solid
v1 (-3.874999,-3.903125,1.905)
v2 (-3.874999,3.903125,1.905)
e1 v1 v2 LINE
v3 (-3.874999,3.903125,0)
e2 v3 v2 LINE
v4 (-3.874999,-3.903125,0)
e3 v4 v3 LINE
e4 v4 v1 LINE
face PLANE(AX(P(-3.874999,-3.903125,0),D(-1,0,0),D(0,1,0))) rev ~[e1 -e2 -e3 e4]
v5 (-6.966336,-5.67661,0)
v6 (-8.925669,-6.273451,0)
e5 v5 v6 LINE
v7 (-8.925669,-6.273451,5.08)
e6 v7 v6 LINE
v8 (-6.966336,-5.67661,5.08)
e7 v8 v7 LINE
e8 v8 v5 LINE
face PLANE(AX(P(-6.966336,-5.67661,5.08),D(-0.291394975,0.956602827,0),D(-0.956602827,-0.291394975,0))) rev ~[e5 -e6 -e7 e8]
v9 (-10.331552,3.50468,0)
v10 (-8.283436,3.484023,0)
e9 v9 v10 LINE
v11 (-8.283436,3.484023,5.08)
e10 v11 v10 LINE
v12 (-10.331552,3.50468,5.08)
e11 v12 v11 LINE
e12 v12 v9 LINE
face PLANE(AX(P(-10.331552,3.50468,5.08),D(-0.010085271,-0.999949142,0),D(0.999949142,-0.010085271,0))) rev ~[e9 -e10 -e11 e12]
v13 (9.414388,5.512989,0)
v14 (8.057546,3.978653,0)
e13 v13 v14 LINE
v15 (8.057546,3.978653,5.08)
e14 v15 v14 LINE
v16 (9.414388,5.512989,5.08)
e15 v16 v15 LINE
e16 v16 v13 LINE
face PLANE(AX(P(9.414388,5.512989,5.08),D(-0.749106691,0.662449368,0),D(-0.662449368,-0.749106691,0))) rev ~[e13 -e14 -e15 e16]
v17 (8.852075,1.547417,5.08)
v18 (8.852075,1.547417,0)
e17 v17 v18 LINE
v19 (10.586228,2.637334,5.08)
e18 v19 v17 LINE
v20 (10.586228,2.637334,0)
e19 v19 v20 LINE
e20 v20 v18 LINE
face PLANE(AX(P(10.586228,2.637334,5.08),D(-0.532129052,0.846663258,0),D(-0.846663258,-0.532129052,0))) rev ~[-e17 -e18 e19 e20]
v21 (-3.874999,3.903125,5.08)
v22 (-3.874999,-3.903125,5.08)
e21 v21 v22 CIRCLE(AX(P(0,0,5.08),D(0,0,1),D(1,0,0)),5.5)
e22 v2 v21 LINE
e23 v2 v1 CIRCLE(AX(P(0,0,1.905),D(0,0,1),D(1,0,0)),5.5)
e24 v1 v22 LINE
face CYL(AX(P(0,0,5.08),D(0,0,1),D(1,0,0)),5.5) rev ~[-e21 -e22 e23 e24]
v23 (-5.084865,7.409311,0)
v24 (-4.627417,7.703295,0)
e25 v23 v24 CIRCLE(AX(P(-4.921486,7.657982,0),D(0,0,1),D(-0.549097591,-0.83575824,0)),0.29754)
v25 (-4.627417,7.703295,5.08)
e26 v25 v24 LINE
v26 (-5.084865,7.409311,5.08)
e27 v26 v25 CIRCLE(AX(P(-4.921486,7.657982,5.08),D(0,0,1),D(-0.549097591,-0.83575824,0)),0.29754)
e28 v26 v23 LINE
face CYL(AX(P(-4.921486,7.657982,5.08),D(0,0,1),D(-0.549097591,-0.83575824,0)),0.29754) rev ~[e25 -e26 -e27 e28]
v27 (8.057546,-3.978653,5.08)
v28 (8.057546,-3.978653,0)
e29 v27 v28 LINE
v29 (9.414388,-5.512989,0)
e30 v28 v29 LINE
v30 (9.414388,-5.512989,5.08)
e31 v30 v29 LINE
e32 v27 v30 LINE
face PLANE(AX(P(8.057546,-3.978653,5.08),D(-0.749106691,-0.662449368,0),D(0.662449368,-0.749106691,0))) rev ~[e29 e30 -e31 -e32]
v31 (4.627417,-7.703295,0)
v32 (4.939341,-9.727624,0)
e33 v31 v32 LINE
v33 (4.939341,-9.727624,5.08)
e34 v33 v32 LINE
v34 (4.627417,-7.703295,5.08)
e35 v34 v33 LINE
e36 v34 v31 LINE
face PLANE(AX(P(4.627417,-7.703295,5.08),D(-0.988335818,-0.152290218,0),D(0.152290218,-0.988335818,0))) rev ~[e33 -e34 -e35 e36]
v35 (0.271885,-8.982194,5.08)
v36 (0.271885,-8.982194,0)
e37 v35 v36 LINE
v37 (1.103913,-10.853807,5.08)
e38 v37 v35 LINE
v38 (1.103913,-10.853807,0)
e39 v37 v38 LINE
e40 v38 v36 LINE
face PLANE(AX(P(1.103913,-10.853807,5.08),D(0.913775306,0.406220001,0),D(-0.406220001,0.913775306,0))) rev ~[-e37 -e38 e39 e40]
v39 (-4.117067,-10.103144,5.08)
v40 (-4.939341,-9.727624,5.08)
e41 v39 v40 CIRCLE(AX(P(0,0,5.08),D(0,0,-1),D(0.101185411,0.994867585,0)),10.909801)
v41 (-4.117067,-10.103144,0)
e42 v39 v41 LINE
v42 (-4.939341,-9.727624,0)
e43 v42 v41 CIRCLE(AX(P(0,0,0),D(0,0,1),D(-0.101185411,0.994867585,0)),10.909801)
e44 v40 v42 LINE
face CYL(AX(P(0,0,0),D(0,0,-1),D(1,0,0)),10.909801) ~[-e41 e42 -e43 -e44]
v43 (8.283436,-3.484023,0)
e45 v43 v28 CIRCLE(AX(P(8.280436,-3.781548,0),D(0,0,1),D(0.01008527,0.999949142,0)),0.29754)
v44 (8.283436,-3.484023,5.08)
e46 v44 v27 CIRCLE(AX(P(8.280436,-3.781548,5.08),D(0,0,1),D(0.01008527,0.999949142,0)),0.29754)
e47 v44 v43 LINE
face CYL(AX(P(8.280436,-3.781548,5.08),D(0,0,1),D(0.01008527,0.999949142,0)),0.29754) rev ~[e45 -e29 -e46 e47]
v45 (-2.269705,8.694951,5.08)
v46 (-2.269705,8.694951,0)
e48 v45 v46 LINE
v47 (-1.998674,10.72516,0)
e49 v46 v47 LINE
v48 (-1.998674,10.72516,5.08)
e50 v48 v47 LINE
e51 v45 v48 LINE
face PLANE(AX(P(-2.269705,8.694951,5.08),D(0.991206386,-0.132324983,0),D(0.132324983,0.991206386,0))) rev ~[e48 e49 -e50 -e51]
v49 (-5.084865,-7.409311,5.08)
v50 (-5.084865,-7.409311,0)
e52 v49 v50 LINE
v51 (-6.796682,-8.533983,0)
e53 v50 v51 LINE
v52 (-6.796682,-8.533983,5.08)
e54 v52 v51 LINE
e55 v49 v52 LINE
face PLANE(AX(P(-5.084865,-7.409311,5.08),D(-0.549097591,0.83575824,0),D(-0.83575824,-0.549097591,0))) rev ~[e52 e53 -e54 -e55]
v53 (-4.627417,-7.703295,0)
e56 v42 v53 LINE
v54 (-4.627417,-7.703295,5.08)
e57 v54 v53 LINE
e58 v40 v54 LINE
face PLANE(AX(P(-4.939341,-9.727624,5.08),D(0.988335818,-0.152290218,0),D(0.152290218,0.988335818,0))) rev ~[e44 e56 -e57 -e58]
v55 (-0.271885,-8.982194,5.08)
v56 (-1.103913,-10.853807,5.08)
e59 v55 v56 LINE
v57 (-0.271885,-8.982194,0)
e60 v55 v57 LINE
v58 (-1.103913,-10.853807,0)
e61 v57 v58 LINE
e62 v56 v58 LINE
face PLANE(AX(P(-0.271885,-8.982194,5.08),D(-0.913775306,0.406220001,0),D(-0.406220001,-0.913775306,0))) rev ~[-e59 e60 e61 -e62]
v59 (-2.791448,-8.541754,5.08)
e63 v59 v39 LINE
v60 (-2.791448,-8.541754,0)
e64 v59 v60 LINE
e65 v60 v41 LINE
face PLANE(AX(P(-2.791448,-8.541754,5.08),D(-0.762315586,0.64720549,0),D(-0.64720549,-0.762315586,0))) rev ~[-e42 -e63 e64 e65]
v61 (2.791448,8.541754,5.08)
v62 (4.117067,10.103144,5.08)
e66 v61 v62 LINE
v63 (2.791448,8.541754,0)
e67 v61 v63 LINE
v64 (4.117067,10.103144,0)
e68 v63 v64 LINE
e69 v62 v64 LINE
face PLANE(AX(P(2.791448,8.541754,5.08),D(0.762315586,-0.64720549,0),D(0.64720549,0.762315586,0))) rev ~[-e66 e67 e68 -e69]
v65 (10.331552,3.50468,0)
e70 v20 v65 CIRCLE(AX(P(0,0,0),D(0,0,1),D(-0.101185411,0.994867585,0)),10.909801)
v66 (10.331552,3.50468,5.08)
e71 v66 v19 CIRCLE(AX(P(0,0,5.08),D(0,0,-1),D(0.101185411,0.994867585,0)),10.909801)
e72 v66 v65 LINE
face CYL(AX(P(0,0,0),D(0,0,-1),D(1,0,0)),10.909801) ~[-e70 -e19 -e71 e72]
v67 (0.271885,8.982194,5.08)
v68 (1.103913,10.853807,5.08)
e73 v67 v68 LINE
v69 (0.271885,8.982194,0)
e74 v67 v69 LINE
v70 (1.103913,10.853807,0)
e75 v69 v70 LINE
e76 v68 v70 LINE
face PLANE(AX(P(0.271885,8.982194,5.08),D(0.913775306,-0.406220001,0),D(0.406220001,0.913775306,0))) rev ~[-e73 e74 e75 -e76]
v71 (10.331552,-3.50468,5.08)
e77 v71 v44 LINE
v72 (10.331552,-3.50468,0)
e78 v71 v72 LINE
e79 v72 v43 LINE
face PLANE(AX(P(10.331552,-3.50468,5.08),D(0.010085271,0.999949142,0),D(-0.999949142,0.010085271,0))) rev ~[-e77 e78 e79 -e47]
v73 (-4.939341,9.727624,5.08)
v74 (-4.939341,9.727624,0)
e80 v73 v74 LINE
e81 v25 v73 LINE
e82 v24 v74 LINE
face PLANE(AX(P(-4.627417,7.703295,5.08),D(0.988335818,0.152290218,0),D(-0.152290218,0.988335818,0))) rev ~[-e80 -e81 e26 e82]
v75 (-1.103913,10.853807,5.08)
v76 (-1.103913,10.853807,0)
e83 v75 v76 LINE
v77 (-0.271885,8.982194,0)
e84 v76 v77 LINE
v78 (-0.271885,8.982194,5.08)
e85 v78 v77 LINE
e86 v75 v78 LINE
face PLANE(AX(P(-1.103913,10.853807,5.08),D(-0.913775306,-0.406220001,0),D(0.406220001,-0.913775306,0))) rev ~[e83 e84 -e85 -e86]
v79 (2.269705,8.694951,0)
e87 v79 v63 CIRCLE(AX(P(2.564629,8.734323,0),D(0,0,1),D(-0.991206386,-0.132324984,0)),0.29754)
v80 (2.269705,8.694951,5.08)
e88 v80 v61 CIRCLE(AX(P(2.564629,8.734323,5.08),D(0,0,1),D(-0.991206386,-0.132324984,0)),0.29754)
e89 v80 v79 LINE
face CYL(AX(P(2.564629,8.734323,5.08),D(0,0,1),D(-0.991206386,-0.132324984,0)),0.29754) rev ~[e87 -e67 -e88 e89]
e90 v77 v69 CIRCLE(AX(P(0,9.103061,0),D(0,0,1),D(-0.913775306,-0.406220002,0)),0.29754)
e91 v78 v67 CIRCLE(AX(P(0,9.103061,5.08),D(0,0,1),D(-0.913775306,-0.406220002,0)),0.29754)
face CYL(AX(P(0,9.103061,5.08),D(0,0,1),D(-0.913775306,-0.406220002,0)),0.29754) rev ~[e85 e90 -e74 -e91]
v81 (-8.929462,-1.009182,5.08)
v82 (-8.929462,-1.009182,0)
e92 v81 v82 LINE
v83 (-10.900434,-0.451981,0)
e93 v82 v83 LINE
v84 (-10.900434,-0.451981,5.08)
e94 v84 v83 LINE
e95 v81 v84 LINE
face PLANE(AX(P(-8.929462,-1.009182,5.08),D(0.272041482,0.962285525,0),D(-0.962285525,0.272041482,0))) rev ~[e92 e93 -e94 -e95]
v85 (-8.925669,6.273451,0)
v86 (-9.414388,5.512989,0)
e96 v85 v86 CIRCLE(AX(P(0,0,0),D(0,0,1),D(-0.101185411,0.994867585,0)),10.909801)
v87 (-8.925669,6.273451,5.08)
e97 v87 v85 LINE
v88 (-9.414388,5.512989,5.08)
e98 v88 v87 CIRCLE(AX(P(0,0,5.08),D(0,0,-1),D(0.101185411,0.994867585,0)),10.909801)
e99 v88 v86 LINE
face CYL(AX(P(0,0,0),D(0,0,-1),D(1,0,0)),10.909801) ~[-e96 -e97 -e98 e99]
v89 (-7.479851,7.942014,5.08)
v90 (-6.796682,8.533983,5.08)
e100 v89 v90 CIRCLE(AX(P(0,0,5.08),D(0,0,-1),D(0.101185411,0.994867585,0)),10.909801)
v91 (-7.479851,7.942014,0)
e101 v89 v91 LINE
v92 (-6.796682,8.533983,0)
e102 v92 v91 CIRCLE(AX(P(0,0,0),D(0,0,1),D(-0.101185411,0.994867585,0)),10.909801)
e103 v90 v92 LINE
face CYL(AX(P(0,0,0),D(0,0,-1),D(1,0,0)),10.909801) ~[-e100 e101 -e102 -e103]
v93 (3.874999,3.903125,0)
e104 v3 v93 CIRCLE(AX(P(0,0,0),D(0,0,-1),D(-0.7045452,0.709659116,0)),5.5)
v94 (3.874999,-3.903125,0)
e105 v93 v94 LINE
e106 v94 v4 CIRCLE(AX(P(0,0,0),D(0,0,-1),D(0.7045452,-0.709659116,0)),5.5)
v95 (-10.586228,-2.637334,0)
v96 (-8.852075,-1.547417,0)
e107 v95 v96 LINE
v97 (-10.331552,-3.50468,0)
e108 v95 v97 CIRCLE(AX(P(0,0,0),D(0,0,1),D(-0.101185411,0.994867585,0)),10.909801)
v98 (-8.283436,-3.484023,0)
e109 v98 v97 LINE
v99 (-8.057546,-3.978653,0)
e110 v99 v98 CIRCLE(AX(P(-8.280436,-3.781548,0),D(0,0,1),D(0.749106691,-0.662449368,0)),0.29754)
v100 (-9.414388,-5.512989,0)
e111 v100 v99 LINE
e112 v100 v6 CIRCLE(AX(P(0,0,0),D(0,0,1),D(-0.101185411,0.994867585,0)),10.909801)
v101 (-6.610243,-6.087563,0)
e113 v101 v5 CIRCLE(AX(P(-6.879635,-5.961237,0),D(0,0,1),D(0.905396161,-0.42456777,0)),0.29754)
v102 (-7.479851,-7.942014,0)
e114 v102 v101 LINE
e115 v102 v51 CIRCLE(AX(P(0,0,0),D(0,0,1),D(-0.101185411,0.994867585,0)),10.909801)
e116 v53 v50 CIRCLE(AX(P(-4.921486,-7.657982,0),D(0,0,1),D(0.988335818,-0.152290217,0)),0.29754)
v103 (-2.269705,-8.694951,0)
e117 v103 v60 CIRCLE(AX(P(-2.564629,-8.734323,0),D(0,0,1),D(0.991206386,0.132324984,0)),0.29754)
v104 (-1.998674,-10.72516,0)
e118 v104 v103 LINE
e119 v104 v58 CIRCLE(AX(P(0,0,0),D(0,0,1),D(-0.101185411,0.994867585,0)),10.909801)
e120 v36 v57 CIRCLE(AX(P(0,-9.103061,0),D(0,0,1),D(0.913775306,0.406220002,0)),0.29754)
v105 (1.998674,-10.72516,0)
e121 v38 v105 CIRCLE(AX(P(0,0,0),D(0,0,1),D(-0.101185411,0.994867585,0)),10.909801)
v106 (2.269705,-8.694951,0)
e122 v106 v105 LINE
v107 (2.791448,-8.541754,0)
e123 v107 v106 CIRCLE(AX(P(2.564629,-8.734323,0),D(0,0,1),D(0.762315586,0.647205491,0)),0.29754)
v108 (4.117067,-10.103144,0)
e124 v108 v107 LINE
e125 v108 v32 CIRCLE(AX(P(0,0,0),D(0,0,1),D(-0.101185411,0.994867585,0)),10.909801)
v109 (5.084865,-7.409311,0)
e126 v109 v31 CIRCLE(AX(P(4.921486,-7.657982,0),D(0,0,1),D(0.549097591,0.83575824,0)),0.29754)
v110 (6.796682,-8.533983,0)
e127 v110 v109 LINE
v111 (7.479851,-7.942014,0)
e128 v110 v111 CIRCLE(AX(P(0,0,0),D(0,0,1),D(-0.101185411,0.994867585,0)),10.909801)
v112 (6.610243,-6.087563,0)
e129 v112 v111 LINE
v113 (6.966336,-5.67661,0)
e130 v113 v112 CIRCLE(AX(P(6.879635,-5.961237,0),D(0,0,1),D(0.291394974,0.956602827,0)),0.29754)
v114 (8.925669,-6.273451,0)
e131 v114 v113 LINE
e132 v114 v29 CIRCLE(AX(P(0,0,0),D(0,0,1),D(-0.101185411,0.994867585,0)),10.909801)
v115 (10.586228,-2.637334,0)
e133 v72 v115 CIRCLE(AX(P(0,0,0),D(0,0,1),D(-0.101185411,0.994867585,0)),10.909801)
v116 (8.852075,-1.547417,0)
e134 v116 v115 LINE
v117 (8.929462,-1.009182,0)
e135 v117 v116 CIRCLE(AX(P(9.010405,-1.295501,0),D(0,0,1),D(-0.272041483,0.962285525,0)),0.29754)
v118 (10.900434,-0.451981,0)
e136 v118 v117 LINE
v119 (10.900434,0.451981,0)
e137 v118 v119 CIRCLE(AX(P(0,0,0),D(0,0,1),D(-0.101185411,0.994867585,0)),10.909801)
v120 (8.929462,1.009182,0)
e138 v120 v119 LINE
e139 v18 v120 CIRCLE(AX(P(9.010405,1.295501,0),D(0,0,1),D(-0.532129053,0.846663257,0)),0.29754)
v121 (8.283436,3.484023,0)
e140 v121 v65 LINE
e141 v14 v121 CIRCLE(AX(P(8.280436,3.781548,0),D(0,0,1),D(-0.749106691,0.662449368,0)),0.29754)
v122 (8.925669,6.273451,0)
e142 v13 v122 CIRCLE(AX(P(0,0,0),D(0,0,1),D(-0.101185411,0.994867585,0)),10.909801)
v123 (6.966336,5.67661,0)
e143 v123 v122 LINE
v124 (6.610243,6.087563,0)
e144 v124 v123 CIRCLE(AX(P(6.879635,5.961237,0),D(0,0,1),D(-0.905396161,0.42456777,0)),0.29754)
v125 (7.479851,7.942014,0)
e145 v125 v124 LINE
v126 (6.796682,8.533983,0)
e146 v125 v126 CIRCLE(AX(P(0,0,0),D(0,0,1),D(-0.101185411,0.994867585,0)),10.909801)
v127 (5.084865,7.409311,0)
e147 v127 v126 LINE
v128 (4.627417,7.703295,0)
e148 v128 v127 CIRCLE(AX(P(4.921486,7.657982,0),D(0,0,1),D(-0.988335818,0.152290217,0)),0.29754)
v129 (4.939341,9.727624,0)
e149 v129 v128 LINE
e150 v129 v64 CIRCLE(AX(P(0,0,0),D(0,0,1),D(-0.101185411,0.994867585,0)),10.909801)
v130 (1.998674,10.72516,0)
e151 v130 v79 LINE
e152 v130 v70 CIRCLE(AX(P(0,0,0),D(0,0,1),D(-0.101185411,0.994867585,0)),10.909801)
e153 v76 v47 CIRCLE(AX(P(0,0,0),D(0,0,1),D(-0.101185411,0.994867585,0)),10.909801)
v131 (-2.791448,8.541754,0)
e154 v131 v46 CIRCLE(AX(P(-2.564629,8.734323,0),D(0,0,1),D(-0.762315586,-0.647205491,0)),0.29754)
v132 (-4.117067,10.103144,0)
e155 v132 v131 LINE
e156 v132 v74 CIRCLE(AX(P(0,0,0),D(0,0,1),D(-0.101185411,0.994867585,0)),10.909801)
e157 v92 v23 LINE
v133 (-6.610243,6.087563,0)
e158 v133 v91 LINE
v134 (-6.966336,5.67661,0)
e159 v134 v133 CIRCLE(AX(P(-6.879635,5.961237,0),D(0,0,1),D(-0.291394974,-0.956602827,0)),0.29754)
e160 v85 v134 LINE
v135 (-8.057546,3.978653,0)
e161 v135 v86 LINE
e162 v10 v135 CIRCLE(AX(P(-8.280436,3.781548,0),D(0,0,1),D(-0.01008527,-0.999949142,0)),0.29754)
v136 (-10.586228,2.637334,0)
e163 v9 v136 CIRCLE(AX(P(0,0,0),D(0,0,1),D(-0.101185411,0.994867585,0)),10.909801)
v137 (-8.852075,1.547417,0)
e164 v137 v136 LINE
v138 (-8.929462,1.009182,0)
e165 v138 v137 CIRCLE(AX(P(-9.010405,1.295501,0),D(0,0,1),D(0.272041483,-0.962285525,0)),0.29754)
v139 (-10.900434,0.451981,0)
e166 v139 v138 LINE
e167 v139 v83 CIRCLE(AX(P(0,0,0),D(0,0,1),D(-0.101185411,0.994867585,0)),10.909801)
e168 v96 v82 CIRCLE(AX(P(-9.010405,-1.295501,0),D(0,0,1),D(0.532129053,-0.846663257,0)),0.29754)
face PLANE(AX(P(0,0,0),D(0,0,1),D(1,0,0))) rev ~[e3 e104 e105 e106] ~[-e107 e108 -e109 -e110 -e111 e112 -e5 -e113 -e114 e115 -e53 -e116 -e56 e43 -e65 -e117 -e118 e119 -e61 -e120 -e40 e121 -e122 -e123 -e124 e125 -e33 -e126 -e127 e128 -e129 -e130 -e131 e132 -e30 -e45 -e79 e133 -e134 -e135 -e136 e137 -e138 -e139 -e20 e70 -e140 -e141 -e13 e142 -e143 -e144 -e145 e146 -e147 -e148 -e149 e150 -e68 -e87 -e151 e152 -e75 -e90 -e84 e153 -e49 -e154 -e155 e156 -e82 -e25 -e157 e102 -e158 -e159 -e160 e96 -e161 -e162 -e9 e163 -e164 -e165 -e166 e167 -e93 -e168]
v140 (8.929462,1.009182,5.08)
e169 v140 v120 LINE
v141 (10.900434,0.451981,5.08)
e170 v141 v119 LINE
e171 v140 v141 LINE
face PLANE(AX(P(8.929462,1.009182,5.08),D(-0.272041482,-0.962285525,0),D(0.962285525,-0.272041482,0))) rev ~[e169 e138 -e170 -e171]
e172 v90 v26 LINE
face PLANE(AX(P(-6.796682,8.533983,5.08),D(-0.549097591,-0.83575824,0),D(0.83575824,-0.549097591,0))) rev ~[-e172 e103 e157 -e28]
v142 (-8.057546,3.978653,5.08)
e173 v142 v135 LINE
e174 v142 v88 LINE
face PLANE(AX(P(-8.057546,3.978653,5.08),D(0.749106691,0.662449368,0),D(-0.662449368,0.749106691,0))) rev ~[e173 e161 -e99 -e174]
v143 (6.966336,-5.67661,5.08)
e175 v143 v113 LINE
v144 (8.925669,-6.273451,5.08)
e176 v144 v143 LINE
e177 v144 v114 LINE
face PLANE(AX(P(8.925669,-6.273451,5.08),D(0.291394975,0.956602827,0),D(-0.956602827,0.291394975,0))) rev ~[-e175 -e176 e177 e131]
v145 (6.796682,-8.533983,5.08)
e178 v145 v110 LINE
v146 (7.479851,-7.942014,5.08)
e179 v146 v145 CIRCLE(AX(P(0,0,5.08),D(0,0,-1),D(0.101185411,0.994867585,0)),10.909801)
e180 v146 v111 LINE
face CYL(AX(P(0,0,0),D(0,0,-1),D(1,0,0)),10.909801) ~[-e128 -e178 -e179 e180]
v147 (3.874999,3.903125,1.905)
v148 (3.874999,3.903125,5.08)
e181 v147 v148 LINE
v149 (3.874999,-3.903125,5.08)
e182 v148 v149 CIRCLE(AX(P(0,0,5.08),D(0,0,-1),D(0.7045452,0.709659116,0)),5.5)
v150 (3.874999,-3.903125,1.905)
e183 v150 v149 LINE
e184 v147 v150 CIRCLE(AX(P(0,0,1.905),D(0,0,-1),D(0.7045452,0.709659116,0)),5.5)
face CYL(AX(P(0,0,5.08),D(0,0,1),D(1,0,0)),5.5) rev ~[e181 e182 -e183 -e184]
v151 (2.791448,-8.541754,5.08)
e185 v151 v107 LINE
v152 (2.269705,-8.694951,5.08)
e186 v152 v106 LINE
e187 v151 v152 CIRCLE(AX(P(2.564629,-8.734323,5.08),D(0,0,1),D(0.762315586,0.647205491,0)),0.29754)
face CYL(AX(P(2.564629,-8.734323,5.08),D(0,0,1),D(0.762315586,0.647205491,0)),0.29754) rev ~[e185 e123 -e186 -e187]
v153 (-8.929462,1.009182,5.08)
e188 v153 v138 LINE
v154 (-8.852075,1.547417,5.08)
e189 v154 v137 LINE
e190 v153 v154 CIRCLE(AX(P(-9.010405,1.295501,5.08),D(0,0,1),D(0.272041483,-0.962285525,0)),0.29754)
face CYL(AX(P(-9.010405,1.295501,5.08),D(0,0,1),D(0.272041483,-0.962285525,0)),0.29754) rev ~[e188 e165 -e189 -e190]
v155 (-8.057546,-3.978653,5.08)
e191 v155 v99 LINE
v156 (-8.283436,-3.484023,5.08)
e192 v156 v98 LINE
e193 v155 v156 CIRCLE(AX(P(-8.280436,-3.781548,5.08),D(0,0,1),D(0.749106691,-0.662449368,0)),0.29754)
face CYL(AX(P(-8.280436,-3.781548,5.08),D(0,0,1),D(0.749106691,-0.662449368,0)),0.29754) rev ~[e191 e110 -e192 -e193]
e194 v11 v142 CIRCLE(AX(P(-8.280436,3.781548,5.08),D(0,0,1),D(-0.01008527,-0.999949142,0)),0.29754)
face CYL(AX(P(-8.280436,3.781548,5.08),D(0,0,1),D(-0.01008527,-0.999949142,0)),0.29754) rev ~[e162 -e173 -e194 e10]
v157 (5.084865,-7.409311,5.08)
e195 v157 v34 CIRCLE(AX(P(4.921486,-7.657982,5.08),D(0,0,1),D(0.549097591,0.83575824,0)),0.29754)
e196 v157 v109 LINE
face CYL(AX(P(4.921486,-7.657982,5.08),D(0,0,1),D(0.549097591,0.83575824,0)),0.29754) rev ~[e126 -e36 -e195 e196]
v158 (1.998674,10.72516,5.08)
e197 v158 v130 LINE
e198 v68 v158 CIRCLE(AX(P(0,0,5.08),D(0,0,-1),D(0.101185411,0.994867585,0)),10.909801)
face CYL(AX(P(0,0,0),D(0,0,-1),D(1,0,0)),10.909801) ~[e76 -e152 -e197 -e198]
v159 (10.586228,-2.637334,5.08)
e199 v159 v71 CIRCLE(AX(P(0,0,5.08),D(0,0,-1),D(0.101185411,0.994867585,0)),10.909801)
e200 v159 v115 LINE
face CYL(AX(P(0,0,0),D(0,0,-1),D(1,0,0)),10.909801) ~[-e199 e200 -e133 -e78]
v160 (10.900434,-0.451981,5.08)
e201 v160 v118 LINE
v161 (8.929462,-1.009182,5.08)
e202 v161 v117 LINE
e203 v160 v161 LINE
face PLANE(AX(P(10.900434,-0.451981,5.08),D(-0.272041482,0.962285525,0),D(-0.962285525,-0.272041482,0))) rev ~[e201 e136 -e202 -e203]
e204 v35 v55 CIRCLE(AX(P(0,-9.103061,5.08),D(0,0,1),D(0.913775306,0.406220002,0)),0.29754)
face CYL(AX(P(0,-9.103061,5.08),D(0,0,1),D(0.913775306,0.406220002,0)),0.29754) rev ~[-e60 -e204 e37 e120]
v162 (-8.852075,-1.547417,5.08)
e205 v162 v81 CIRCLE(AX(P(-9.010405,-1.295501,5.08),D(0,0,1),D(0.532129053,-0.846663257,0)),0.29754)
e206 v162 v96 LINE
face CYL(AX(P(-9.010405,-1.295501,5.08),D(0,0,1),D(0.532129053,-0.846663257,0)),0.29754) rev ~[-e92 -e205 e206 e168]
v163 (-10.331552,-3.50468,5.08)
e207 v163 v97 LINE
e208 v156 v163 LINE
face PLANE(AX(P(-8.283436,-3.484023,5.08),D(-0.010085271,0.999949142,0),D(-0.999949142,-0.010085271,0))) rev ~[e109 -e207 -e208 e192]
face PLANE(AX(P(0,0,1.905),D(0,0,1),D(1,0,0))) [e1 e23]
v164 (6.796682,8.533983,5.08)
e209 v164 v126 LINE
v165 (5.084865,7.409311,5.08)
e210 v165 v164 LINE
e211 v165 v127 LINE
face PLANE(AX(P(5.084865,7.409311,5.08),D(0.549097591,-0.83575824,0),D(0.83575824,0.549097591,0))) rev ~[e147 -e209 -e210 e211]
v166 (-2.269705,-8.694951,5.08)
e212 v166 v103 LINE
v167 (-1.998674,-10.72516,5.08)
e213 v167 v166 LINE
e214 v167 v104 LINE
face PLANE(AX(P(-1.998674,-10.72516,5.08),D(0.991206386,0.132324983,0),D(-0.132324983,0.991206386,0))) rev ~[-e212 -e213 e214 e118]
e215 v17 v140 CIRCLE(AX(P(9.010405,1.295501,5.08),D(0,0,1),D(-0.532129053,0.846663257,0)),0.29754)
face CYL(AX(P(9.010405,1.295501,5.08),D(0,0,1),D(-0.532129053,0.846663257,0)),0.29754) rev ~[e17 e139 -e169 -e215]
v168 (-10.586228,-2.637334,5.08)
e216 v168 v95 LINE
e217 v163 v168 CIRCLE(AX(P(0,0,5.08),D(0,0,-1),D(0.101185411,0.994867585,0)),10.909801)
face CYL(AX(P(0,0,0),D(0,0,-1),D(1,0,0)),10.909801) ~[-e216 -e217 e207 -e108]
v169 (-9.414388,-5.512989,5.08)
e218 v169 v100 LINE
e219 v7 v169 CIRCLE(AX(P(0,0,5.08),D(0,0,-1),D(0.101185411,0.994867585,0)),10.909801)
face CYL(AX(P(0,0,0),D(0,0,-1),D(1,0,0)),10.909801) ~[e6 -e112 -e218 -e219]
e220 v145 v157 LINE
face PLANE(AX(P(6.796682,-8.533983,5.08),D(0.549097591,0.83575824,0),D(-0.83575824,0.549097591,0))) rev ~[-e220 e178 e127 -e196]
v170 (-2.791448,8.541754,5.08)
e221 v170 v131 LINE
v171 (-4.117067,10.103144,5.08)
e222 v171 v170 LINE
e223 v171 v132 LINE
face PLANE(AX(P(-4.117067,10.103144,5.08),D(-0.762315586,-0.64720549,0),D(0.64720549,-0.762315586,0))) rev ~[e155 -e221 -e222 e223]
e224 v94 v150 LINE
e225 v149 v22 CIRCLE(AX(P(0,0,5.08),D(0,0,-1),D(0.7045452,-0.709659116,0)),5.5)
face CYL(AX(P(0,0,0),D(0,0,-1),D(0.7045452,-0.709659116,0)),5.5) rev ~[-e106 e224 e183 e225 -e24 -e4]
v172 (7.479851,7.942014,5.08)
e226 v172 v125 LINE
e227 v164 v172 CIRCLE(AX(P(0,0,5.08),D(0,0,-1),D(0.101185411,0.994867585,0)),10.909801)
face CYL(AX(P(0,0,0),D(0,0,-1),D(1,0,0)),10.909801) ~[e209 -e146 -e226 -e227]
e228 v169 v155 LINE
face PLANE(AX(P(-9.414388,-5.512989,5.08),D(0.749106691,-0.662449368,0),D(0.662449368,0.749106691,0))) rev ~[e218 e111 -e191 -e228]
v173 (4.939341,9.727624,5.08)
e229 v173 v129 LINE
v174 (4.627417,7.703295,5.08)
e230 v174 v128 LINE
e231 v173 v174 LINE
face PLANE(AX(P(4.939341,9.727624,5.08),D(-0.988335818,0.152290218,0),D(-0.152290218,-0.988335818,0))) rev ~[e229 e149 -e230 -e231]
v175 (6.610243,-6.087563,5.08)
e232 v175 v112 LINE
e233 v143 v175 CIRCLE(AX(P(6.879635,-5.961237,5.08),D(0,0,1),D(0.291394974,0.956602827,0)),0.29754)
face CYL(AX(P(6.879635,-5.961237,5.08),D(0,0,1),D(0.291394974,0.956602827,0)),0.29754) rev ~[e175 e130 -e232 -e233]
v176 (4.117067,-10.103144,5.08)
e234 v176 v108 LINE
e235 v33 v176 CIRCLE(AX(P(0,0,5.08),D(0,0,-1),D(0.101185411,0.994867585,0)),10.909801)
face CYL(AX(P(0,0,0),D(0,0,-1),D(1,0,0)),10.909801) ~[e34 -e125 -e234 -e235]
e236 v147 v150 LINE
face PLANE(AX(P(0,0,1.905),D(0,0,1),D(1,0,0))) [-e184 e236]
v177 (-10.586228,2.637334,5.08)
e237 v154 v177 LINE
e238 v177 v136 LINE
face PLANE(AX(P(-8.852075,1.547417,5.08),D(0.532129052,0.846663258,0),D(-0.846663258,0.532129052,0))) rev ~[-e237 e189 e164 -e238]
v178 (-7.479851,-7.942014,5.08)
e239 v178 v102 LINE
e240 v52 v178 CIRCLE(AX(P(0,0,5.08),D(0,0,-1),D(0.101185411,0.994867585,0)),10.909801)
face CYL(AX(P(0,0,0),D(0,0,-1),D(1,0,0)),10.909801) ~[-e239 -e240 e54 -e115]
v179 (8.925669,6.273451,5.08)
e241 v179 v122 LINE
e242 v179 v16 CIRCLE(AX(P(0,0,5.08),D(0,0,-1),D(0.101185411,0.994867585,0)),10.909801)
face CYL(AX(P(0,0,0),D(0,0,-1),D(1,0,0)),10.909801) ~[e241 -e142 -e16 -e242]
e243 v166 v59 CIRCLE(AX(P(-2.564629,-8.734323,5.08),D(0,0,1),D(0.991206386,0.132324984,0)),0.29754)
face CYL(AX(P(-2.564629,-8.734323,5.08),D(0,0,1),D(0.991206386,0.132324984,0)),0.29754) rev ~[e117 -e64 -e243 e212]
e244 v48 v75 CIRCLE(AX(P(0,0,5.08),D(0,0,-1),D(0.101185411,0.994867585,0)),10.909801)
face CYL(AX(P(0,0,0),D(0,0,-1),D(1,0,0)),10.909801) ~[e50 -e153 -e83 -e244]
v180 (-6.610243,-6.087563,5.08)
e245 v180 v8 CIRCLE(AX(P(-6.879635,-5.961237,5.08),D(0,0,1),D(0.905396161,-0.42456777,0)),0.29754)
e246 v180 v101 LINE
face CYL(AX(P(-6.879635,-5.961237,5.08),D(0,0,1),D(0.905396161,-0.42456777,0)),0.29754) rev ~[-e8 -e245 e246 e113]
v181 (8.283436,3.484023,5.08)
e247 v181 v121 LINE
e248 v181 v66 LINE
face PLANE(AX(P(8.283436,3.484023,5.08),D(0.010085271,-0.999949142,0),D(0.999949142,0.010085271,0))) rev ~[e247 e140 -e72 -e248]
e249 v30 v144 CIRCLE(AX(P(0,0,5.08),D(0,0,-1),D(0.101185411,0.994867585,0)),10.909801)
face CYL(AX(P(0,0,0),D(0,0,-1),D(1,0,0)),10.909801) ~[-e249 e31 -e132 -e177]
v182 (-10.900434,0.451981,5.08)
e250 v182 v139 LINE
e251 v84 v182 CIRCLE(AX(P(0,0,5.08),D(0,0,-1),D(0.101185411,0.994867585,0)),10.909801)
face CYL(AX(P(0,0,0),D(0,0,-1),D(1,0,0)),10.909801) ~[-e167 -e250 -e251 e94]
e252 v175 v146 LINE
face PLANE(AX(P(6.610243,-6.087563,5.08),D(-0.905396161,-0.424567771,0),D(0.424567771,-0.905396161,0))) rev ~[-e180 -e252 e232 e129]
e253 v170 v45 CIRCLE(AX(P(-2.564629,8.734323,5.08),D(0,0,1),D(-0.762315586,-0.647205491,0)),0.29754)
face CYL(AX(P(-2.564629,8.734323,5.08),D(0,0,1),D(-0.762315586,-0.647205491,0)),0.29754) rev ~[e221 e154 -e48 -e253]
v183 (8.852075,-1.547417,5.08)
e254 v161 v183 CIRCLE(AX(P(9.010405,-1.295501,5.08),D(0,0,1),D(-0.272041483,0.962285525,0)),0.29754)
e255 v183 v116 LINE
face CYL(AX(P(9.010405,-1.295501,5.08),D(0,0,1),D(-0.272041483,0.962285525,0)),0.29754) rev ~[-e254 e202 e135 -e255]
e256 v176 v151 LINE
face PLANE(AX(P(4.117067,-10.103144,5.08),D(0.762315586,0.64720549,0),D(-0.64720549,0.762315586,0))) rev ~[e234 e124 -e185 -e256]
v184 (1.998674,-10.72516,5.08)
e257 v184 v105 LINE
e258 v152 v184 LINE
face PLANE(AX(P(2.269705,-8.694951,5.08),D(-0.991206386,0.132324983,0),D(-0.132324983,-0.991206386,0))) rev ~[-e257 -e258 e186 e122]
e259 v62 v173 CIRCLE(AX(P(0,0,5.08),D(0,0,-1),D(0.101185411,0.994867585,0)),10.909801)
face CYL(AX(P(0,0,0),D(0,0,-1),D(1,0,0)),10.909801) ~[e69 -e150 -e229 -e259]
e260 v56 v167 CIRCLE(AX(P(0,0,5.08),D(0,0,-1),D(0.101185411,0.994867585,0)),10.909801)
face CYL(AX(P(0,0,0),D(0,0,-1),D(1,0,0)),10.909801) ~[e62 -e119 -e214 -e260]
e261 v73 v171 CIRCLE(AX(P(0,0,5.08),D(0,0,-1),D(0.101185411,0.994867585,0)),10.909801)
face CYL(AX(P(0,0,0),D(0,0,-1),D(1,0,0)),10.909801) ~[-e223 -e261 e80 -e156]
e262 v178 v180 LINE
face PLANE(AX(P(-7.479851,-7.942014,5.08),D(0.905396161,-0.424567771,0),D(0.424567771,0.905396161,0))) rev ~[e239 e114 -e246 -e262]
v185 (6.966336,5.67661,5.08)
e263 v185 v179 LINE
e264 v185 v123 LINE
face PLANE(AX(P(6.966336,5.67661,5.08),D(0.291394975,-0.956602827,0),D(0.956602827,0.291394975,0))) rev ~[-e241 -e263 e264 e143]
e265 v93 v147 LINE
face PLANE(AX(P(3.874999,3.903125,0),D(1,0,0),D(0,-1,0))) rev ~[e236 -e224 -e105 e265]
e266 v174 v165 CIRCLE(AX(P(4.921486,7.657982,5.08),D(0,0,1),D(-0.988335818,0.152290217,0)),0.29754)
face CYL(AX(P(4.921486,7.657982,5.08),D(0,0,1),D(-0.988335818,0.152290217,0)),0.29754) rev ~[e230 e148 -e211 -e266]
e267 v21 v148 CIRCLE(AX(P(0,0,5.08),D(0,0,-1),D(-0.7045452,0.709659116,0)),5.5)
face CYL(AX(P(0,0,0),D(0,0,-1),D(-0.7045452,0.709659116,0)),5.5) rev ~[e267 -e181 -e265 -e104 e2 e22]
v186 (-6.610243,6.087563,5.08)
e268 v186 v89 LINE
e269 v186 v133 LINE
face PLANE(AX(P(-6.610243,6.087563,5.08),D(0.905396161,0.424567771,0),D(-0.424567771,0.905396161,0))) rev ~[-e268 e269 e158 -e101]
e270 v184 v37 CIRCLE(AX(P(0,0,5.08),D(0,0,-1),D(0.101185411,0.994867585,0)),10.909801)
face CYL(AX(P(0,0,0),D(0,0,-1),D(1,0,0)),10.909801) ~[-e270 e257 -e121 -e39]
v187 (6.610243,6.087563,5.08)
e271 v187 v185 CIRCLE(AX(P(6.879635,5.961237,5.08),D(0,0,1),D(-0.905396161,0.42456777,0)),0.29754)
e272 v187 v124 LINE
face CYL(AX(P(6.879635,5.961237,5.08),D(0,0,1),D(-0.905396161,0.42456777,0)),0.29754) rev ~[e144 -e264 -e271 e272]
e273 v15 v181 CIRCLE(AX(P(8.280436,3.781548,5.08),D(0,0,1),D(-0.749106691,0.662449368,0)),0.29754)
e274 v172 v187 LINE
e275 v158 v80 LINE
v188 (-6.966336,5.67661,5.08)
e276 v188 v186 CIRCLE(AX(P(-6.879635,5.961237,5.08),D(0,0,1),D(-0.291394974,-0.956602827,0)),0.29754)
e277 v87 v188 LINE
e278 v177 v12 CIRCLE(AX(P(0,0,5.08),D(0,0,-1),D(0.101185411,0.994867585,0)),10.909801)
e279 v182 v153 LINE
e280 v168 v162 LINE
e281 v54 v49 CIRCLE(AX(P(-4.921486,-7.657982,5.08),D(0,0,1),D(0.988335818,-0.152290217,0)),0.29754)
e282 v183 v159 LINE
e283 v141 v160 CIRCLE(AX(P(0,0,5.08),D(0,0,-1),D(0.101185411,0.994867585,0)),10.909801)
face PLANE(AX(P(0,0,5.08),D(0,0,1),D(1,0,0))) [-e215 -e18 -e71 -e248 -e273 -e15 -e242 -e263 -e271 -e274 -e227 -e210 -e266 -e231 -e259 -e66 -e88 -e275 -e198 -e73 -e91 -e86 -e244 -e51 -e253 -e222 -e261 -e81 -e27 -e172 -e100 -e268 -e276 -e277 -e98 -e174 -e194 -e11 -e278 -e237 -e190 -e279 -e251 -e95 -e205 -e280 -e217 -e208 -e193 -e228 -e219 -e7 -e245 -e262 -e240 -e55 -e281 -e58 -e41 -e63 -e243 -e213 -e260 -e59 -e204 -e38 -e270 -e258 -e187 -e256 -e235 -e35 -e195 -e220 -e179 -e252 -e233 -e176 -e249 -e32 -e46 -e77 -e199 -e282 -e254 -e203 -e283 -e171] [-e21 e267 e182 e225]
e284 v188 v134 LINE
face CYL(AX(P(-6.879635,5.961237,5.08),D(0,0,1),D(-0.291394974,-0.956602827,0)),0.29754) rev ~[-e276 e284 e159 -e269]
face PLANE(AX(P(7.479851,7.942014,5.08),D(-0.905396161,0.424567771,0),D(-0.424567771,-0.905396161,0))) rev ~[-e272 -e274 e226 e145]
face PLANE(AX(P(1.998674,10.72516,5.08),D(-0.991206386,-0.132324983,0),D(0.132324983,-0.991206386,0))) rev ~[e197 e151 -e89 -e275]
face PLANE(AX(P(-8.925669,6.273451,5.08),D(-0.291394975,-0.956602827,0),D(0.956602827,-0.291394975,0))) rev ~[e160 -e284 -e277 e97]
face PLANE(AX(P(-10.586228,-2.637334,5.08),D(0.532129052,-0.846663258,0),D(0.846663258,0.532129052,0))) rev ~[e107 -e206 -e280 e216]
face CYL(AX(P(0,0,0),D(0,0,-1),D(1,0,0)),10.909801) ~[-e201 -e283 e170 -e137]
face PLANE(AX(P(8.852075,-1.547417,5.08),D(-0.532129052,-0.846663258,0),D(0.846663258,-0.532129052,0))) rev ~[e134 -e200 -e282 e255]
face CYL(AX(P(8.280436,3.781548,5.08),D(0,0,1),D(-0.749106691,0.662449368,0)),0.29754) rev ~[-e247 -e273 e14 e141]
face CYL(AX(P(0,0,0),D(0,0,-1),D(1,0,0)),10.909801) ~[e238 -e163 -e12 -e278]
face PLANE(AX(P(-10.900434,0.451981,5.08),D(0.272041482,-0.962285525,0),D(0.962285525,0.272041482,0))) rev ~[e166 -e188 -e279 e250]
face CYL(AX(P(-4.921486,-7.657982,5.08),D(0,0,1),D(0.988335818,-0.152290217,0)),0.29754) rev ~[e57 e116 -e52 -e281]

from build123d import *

# Parameters (mm, degrees)
F0_R            = 10.909800859
F1_DEPTH        = 5.08
F3_DEPTH        = 5.08
F3_COPIES_COUNT = 22
F4_R            = 5.5
F5_DEPTH        = 3.175


# Not quite as in the source:
# - a pattern or mirror of a feature is missing from the dataset's text; its kind, count and spacing are read off the source's solid


with BuildPart() as f1:
    # F0 (on Top) → F1 (new body)
    with BuildSketch(Plane.XY):
        Circle(F0_R)
        with BuildLine():
            ThreePointArc((3.8749986, -3.9031251389), (0, -5.5), (-3.8749986, -3.9031251389))
            Line((-3.8749986, -3.9031251389), (-3.8749986, 3.9031251389))
            ThreePointArc((-3.8749986, 3.9031251389), (0, 5.5), (3.8749986, 3.9031251389))
            Line((3.8749986, 3.9031251389), (3.8749986, -3.9031251389))
        make_face(mode=Mode.SUBTRACT)
    extrude(amount=F1_DEPTH)

    # F2 (on face) → F3 (cut, through all)
    with BuildSketch(Plane.XY.offset(5.08)):
        with BuildLine():
            Line((0.2718847261, 8.9821943232), (1.1039126824, 10.8538072386))
            ThreePointArc((1.1039126824, 10.8538072386), (0, 10.909800859), (-1.1039126824, 10.8538072386))
            Line((-1.1039126824, 10.8538072386), (-0.2718847261, 8.9821943232))
            ThreePointArc((-0.2718847261, 8.9821943232), (0, 8.8055210085), (0.2718847261, 8.9821943232))
        make_face()
    f3 = extrude(amount=-F3_DEPTH, mode=Mode.SUBTRACT)

    # F3_copies: F3 ×22 about axis
    f3_copies_axis = Axis((0, 0, 0), (0, 0, 1))
    for i in range(1, F3_COPIES_COUNT):
        add(f3.rotate(f3_copies_axis, i * 360 / F3_COPIES_COUNT), mode=Mode.SUBTRACT)

    # F4 (on face) → F5 (cut)
    with BuildSketch(Plane.XY.offset(5.08)):
        Circle(F4_R)
    extrude(amount=-F5_DEPTH, mode=Mode.SUBTRACT)


solid = f1.part
